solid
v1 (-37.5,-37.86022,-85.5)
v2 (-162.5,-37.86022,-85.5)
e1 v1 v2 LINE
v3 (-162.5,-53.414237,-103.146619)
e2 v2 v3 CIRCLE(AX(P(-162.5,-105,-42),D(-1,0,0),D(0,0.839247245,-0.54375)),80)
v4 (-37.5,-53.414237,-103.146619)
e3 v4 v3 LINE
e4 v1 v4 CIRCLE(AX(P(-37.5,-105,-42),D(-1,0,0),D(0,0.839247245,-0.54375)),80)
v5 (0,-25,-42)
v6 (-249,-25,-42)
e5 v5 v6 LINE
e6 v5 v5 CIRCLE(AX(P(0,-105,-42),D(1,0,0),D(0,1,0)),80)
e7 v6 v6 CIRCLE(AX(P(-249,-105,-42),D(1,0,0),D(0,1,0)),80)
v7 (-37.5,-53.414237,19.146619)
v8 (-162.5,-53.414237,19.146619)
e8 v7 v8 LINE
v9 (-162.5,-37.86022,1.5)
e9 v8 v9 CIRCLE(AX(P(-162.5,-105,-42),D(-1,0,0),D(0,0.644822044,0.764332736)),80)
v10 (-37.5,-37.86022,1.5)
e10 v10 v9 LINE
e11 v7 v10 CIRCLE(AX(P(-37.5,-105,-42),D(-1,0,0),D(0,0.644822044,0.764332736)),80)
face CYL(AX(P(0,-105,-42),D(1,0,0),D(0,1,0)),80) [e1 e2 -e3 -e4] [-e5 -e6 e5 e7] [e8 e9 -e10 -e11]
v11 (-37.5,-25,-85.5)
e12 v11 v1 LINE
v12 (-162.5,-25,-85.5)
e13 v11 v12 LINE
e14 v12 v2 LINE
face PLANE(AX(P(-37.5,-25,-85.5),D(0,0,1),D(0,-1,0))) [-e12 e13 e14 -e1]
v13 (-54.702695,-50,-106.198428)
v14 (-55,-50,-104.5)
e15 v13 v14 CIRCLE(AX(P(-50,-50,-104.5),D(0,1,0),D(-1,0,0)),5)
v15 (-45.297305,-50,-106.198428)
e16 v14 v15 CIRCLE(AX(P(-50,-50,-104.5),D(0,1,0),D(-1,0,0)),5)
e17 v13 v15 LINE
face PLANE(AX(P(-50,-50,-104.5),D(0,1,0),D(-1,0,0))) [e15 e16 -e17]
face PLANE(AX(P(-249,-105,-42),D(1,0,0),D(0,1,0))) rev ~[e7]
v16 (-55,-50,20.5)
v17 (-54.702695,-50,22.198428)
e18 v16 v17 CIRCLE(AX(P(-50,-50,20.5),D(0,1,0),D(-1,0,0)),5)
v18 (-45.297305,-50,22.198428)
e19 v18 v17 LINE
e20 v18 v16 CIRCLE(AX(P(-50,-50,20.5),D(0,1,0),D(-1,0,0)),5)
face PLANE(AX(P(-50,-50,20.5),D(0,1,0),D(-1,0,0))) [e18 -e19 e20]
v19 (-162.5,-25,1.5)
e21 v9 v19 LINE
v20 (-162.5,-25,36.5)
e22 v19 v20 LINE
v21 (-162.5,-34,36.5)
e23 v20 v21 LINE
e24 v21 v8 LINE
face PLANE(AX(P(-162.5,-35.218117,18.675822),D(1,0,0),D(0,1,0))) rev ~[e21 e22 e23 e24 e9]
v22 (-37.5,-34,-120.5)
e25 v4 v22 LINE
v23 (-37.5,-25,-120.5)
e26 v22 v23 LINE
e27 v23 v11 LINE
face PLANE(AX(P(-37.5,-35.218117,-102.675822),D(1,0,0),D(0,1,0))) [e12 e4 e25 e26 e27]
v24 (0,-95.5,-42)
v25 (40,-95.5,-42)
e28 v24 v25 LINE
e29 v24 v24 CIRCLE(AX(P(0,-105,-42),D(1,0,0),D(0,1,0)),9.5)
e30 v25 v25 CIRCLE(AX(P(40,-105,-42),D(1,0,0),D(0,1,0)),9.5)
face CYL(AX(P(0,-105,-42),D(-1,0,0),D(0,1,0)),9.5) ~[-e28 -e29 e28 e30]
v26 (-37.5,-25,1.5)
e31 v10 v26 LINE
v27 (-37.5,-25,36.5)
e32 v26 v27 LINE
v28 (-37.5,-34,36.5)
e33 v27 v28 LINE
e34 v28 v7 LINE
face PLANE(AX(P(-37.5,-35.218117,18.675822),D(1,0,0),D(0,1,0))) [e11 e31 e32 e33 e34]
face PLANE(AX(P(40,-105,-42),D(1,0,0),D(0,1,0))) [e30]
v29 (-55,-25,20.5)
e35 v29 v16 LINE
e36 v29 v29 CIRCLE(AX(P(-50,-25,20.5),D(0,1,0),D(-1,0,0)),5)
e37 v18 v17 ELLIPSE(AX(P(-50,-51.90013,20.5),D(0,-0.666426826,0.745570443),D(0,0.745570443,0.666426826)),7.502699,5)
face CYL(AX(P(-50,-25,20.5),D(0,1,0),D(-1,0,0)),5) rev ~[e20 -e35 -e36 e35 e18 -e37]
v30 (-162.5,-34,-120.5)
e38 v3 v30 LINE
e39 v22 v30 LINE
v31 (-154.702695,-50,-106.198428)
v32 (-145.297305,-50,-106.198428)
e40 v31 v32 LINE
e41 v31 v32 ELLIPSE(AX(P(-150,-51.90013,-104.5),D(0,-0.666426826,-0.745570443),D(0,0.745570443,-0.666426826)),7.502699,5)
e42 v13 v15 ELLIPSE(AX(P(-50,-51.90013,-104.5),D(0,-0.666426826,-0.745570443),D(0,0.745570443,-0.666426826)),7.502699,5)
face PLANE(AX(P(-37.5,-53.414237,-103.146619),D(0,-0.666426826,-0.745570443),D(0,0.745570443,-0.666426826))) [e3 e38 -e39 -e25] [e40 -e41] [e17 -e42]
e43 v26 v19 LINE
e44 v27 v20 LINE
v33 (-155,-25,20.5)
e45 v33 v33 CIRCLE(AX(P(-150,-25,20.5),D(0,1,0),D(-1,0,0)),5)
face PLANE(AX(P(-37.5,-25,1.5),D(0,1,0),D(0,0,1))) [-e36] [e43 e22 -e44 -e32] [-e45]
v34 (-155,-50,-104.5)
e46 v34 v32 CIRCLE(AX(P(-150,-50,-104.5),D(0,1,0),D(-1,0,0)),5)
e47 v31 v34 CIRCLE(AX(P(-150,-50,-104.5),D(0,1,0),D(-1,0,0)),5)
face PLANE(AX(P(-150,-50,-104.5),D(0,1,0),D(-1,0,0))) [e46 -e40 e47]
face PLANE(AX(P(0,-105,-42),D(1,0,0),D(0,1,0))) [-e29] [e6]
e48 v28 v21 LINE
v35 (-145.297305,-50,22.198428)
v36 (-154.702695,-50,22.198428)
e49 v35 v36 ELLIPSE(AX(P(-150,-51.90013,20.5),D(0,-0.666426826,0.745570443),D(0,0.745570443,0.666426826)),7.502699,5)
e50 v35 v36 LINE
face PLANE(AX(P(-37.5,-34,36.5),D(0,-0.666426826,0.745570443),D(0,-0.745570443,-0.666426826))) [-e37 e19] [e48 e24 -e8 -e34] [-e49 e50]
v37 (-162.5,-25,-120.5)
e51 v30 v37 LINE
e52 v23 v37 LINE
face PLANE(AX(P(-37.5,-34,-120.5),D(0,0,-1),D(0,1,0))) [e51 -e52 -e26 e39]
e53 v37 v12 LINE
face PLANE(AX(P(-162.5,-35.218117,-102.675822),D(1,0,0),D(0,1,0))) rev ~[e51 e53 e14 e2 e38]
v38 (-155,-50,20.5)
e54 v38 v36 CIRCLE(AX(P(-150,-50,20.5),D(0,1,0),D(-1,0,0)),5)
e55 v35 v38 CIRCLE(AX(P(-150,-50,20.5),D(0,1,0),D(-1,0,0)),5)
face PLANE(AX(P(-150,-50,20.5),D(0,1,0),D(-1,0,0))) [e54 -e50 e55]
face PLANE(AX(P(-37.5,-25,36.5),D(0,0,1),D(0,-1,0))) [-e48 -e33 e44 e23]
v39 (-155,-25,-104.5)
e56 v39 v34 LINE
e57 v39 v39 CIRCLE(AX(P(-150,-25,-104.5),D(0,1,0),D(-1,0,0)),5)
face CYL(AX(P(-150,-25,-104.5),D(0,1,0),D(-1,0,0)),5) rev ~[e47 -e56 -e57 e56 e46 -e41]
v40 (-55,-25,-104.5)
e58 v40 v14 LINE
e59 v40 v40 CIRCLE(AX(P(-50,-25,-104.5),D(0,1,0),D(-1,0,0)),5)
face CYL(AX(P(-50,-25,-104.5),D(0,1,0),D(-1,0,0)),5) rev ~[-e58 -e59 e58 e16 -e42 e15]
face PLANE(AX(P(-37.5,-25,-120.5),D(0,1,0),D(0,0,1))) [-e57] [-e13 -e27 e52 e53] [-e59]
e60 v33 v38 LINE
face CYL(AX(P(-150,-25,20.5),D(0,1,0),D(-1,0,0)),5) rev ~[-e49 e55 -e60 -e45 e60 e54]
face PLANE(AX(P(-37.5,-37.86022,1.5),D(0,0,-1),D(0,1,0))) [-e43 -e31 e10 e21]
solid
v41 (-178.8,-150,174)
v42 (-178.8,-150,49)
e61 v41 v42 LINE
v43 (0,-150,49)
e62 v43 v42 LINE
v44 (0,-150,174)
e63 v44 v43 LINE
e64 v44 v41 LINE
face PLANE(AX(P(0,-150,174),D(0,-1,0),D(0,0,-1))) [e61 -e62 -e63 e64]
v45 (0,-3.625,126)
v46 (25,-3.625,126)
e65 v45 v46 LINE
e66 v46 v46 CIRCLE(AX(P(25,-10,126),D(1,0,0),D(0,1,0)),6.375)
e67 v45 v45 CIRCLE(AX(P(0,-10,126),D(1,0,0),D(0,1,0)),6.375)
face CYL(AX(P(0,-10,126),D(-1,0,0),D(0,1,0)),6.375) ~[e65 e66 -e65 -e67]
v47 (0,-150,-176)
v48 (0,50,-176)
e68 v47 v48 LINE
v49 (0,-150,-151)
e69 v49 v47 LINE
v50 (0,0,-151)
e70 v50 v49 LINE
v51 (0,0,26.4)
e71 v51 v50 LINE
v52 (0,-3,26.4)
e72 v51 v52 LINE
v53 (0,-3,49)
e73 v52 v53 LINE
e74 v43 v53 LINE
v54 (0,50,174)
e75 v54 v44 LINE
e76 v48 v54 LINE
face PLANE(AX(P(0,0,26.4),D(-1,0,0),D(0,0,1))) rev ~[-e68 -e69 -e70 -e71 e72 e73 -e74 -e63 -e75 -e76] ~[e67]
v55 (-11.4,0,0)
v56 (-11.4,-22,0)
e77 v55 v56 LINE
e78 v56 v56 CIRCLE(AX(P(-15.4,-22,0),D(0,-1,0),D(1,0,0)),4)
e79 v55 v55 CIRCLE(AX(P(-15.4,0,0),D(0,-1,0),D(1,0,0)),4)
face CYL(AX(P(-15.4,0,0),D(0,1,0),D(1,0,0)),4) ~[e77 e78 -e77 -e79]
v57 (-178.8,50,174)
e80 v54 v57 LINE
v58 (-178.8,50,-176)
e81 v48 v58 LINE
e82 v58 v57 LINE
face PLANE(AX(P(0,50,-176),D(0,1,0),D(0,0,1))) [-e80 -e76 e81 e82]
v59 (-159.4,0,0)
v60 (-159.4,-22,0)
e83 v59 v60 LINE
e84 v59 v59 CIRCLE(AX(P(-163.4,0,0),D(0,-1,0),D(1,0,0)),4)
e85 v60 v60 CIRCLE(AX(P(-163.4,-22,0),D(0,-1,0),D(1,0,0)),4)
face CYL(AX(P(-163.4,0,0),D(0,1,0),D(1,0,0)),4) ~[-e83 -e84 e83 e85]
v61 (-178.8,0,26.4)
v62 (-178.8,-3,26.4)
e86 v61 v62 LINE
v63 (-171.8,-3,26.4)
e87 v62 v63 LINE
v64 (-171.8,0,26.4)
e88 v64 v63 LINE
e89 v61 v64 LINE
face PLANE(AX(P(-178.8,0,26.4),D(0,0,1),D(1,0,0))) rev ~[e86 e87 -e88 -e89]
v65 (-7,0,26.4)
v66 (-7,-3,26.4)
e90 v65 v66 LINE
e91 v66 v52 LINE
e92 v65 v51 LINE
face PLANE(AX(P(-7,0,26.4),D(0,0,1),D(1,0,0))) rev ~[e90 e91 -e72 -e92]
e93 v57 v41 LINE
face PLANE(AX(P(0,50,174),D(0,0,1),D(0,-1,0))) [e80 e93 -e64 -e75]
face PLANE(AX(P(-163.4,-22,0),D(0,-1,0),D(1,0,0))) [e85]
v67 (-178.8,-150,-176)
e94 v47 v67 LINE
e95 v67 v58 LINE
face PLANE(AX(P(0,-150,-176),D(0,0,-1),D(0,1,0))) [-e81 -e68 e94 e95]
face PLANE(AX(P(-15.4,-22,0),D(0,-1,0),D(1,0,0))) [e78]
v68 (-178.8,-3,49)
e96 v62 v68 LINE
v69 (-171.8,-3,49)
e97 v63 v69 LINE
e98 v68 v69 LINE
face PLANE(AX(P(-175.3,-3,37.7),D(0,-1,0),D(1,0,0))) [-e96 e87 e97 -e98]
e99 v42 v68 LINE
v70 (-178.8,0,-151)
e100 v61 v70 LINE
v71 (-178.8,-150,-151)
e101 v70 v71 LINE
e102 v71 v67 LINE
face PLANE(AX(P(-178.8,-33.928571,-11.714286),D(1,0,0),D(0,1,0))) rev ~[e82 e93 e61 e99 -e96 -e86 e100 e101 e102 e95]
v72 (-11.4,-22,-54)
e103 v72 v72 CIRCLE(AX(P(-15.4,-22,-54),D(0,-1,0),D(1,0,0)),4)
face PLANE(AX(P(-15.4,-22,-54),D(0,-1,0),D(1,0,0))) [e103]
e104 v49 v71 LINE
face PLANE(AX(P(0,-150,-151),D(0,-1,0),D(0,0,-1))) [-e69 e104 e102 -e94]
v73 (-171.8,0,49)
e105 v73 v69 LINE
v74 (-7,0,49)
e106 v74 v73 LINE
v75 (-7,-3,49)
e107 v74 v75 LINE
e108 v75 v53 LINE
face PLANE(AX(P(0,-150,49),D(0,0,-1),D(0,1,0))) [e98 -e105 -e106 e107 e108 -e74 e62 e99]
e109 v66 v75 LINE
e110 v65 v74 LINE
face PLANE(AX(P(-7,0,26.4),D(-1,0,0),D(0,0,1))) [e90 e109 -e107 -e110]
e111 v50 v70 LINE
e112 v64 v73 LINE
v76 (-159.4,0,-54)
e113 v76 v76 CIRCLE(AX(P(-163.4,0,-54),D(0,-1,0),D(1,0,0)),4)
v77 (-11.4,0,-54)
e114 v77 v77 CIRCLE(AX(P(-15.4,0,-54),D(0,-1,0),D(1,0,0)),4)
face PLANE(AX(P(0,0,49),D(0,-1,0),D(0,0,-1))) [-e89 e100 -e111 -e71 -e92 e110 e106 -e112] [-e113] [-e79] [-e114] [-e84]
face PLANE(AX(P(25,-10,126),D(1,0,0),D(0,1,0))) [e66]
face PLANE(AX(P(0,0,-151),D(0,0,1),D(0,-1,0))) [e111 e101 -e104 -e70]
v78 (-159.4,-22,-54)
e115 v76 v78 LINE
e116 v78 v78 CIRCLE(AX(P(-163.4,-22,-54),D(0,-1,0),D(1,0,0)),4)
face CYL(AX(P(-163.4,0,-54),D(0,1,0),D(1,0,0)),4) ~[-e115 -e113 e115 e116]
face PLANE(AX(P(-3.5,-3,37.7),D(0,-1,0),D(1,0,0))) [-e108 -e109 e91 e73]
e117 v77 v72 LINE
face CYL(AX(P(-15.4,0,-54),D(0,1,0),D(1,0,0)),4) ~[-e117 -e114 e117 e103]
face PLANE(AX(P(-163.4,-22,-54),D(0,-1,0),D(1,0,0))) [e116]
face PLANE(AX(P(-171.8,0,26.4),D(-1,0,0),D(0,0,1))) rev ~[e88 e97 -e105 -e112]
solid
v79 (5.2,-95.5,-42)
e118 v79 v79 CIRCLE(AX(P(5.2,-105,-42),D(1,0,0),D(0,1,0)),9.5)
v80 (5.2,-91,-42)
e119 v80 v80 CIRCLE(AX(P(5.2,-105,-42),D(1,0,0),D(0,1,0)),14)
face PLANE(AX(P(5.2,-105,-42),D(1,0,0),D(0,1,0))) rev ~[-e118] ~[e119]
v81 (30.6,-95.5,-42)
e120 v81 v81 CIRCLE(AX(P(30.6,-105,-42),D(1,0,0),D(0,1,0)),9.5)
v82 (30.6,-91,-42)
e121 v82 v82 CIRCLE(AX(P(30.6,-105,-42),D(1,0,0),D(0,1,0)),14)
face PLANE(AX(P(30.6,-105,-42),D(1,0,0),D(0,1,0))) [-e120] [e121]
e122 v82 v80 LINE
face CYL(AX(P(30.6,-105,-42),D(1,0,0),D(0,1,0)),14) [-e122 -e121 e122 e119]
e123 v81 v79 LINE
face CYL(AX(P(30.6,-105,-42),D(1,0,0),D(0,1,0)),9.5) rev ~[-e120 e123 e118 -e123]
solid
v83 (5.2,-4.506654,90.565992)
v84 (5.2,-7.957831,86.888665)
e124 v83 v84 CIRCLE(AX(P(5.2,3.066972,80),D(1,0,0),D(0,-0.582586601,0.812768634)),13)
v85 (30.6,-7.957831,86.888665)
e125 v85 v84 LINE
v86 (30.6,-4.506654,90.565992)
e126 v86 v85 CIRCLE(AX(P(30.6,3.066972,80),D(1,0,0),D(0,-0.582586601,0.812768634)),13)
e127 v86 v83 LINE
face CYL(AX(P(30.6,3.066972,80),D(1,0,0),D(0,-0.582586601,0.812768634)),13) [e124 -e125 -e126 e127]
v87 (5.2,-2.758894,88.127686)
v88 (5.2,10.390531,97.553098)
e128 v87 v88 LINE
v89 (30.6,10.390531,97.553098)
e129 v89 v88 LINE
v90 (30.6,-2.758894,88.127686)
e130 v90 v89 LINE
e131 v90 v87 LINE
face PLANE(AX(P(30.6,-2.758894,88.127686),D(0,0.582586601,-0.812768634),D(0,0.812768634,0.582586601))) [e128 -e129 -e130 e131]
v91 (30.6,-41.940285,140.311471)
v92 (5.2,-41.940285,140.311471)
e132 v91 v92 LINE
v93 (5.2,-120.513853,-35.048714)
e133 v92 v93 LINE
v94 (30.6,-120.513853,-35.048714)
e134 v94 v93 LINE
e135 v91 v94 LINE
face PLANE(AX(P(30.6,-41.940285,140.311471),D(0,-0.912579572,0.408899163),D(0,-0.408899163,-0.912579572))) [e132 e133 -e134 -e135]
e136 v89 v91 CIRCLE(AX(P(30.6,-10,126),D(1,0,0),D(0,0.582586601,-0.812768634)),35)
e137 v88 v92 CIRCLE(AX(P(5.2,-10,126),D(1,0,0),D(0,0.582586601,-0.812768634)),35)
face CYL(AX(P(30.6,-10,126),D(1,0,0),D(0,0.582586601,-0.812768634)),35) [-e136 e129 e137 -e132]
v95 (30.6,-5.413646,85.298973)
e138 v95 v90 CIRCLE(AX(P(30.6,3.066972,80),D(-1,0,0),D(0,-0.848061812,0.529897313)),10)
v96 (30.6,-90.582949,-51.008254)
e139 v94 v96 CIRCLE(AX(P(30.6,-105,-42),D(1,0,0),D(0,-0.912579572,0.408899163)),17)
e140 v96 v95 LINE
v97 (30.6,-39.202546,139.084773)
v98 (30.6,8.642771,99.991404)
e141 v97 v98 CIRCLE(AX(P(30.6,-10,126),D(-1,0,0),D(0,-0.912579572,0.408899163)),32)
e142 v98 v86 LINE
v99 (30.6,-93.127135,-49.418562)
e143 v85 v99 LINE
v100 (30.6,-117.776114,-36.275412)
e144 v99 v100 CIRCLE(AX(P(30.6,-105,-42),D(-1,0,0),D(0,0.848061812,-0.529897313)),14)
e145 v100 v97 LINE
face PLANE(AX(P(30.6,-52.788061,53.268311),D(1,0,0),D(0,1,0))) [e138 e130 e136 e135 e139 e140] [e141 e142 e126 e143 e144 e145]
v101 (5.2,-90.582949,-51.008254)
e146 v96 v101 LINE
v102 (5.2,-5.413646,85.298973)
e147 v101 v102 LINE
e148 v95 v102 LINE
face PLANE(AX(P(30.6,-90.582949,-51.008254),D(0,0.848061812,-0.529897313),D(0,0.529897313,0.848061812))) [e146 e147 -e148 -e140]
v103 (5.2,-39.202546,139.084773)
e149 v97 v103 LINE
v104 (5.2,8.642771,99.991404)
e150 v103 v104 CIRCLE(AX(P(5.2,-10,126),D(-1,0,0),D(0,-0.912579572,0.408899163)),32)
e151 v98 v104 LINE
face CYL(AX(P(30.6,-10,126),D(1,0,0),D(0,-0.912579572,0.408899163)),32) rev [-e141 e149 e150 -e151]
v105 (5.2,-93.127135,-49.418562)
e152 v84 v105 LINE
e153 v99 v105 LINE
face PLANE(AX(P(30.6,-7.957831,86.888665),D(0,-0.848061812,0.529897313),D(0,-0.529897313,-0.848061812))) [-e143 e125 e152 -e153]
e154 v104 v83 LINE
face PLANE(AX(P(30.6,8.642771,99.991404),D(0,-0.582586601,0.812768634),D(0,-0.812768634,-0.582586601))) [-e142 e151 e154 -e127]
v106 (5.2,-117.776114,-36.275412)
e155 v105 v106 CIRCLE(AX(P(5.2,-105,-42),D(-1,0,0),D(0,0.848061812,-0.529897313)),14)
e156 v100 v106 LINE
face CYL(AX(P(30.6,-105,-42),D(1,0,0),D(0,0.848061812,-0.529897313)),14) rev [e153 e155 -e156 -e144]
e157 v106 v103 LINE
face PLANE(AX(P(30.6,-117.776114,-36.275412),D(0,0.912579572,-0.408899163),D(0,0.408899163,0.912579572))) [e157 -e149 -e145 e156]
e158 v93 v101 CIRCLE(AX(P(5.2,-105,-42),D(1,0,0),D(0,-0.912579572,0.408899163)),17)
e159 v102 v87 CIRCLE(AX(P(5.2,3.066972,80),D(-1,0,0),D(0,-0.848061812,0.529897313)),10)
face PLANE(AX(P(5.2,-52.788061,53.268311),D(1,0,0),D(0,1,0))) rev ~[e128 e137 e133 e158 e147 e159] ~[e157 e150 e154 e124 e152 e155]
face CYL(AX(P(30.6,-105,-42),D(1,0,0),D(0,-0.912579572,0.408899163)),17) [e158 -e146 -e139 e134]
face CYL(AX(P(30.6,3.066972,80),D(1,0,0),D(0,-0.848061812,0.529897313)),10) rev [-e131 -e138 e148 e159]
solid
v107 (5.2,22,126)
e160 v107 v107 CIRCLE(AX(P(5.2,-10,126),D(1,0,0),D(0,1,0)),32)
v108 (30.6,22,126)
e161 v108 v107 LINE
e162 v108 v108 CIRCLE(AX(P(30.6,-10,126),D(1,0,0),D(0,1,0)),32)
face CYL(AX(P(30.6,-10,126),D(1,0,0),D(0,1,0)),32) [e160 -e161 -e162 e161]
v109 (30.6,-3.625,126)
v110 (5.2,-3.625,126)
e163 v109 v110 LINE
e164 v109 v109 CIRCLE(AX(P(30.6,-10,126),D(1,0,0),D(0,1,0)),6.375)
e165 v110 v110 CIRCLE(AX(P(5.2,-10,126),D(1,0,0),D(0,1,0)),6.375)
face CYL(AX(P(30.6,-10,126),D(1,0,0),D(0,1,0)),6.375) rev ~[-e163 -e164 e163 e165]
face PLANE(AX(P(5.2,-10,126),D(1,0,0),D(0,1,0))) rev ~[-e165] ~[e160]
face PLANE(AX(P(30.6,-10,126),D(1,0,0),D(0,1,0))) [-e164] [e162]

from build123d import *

# Parameters (mm, degrees)
F0_R      = 6.375
F1_DEPTH  = 25
F3_DEPTH  = 178.8
F4_R      = 4
F5_DEPTH  = 22
F6_W      = 7
F6_H      = 22.6
F7_DEPTH  = 3
F8_R      = 80
F9_DEPTH  = 249
F12_DEPTH = 125
F14_R     = 32
F14_R_2   = 6.375
F15_DEPTH = 25.4
F16_R     = 14
F16_R_2   = 9.5
F17_DEPTH = 25.4
F18_R     = 5
F19_DEPTH = 25
F20_R     = 9.5
F21_DEPTH = 40
F23_DEPTH = 25.4


with BuildPart() as f1:
    # F0 (on Right) → F1 (new body)
    with BuildSketch(Plane.YZ):
        with Locations((-10, 126)):
            Circle(F0_R)
    extrude(amount=F1_DEPTH)

    # F2 (on Right) → F3 (join)
    with BuildSketch(Plane.YZ):
        Polygon((0, 49), (0, -151), (-150, -151), (-150, -176), (50, -176), (50, 174), (-150, 174), (-150, 49), align=None)
    extrude(amount=-F3_DEPTH)

    # F4 (on Front) → F5 (join)
    with BuildSketch(Plane.XZ):
        with Locations((-15.4, 0)):
            Circle(F4_R)
        with Locations((-163.4, 0)):
            Circle(F4_R)
        with Locations((-163.4, -54)):
            Circle(F4_R)
        with Locations((-15.4, -54)):
            Circle(F4_R)
    extrude(amount=F5_DEPTH)

    # F6 (on face) → F7 (join)
    with BuildSketch(Plane.XZ):
        with Locations((-3.5, 37.7)):
            Rectangle(F6_W, F6_H)
        with Locations((-175.3, 37.7)):
            Rectangle(F6_W, F6_H)
    extrude(amount=F7_DEPTH)


with BuildPart() as f9:
    # F8 (on Right) → F9 (new body)
    with BuildSketch(Plane.YZ):
        with Locations((-105, -42)):
            Circle(F8_R)
    extrude(amount=-F9_DEPTH)

    # F11 (on offset) → F12 (join)
    with BuildSketch(Plane.YZ.offset(-37.5)):
        with BuildLine():
            Line((-25, 1.5), (-25, 36.5))
            Line((-25, 36.5), (-34, 36.5))
            Line((-34, 36.5), (-53.4142365036, 19.146618913))
            ThreePointArc((-53.4142365036, 19.146618913), (-44.9850899063, 10.8981149612), (-37.8602204353, 1.5))
            Line((-37.8602204353, 1.5), (-25, 1.5))
        make_face()
        with BuildLine():
            Line((-25, -120.5), (-25, -85.5))
            Line((-25, -85.5), (-37.8602204353, -85.5))
            ThreePointArc((-37.8602204353, -85.5), (-44.9850899063, -94.8981149612), (-53.4142365036, -103.146618913))
            Line((-53.4142365036, -103.146618913), (-34, -120.5))
            Line((-34, -120.5), (-25, -120.5))
        make_face()
    extrude(amount=-F12_DEPTH)

    # F18 (on face) → F19 (cut)
    with BuildSketch(Plane(origin=(0, -25, 0), x_dir=(-1, 0, 0), z_dir=(0, 1, 0))):
        with Locations((50, 20.5)):
            Circle(F18_R)
        with Locations((150, 20.5)):
            Circle(F18_R)
        with Locations((150, -104.5)):
            Circle(F18_R)
        with Locations((50, -104.5)):
            Circle(F18_R)
    extrude(amount=-F19_DEPTH, mode=Mode.SUBTRACT)

    # F20 (on face) → F21 (join)
    with BuildSketch(Plane.YZ):
        with Locations((-105, -42)):
            Circle(F20_R)
    extrude(amount=F21_DEPTH)


with BuildPart() as f15:
    # F14 (on offset) → F15 (new body)
    with BuildSketch(Plane.YZ.offset(30.6)):
        with Locations((-10, 126)):
            Circle(F14_R)
        with Locations((-10, 126)):
            Circle(F14_R_2, mode=Mode.SUBTRACT)
    extrude(amount=-F15_DEPTH)


with BuildPart() as f17:
    # F16 (on offset) → F17 (new body)
    with BuildSketch(Plane.YZ.offset(30.6)):
        with Locations((-105, -42)):
            Circle(F16_R)
        with Locations((-105, -42)):
            Circle(F16_R_2, mode=Mode.SUBTRACT)
    extrude(amount=-F17_DEPTH)


with BuildPart() as f23:
    # F22 (on offset) → F23 (new body)
    with BuildSketch(Plane.YZ.offset(30.6)):
        with BuildLine():
            Line((-41.940285012, 140.3114706913), (-120.5138527201, -35.0487142356))
            ThreePointArc((-120.5138527201, -35.0487142356), (-112.9985919726, -57.000750863), (-90.5829491892, -51.0082543215))
            Line((-90.5829491892, -51.0082543215), (-5.4136460596, 85.2989731303))
            ThreePointArc((-5.4136460596, 85.2989731303), (-4.2247545268, 86.8432976933), (-2.7588939467, 88.1276863388))
            Line((-2.7588939467, 88.1276863388), (10.3905310387, 97.5530978144))
            ThreePointArc((10.3905310387, 97.5530978144), (12.1454017119, 153.1031581742), (-41.940285012, 140.3114706913))
        make_face()
        with BuildLine():
            ThreePointArc((-39.2025462967, 139.0847732035), (10.2472244223, 150.7800303307), (8.6427712354, 99.991403716))
            Line((8.6427712354, 99.991403716), (-4.50665375, 90.5659922404))
            ThreePointArc((-4.50665375, 90.5659922404), (-6.4122725042, 88.8962870013), (-7.9578314968, 86.8886650693))
            Line((-7.9578314968, 86.8886650693), (-93.1271346264, -49.4185623824))
            ThreePointArc((-93.1271346264, -49.4185623824), (-111.5870757422, -54.3535595343), (-117.7761140048, -36.2754117235))
            Line((-117.7761140048, -36.2754117235), (-39.2025462967, 139.0847732035))
        make_face(mode=Mode.SUBTRACT)
    extrude(amount=-F23_DEPTH)


solid = Compound([f1.part, f9.part, f15.part, f17.part, f23.part])
